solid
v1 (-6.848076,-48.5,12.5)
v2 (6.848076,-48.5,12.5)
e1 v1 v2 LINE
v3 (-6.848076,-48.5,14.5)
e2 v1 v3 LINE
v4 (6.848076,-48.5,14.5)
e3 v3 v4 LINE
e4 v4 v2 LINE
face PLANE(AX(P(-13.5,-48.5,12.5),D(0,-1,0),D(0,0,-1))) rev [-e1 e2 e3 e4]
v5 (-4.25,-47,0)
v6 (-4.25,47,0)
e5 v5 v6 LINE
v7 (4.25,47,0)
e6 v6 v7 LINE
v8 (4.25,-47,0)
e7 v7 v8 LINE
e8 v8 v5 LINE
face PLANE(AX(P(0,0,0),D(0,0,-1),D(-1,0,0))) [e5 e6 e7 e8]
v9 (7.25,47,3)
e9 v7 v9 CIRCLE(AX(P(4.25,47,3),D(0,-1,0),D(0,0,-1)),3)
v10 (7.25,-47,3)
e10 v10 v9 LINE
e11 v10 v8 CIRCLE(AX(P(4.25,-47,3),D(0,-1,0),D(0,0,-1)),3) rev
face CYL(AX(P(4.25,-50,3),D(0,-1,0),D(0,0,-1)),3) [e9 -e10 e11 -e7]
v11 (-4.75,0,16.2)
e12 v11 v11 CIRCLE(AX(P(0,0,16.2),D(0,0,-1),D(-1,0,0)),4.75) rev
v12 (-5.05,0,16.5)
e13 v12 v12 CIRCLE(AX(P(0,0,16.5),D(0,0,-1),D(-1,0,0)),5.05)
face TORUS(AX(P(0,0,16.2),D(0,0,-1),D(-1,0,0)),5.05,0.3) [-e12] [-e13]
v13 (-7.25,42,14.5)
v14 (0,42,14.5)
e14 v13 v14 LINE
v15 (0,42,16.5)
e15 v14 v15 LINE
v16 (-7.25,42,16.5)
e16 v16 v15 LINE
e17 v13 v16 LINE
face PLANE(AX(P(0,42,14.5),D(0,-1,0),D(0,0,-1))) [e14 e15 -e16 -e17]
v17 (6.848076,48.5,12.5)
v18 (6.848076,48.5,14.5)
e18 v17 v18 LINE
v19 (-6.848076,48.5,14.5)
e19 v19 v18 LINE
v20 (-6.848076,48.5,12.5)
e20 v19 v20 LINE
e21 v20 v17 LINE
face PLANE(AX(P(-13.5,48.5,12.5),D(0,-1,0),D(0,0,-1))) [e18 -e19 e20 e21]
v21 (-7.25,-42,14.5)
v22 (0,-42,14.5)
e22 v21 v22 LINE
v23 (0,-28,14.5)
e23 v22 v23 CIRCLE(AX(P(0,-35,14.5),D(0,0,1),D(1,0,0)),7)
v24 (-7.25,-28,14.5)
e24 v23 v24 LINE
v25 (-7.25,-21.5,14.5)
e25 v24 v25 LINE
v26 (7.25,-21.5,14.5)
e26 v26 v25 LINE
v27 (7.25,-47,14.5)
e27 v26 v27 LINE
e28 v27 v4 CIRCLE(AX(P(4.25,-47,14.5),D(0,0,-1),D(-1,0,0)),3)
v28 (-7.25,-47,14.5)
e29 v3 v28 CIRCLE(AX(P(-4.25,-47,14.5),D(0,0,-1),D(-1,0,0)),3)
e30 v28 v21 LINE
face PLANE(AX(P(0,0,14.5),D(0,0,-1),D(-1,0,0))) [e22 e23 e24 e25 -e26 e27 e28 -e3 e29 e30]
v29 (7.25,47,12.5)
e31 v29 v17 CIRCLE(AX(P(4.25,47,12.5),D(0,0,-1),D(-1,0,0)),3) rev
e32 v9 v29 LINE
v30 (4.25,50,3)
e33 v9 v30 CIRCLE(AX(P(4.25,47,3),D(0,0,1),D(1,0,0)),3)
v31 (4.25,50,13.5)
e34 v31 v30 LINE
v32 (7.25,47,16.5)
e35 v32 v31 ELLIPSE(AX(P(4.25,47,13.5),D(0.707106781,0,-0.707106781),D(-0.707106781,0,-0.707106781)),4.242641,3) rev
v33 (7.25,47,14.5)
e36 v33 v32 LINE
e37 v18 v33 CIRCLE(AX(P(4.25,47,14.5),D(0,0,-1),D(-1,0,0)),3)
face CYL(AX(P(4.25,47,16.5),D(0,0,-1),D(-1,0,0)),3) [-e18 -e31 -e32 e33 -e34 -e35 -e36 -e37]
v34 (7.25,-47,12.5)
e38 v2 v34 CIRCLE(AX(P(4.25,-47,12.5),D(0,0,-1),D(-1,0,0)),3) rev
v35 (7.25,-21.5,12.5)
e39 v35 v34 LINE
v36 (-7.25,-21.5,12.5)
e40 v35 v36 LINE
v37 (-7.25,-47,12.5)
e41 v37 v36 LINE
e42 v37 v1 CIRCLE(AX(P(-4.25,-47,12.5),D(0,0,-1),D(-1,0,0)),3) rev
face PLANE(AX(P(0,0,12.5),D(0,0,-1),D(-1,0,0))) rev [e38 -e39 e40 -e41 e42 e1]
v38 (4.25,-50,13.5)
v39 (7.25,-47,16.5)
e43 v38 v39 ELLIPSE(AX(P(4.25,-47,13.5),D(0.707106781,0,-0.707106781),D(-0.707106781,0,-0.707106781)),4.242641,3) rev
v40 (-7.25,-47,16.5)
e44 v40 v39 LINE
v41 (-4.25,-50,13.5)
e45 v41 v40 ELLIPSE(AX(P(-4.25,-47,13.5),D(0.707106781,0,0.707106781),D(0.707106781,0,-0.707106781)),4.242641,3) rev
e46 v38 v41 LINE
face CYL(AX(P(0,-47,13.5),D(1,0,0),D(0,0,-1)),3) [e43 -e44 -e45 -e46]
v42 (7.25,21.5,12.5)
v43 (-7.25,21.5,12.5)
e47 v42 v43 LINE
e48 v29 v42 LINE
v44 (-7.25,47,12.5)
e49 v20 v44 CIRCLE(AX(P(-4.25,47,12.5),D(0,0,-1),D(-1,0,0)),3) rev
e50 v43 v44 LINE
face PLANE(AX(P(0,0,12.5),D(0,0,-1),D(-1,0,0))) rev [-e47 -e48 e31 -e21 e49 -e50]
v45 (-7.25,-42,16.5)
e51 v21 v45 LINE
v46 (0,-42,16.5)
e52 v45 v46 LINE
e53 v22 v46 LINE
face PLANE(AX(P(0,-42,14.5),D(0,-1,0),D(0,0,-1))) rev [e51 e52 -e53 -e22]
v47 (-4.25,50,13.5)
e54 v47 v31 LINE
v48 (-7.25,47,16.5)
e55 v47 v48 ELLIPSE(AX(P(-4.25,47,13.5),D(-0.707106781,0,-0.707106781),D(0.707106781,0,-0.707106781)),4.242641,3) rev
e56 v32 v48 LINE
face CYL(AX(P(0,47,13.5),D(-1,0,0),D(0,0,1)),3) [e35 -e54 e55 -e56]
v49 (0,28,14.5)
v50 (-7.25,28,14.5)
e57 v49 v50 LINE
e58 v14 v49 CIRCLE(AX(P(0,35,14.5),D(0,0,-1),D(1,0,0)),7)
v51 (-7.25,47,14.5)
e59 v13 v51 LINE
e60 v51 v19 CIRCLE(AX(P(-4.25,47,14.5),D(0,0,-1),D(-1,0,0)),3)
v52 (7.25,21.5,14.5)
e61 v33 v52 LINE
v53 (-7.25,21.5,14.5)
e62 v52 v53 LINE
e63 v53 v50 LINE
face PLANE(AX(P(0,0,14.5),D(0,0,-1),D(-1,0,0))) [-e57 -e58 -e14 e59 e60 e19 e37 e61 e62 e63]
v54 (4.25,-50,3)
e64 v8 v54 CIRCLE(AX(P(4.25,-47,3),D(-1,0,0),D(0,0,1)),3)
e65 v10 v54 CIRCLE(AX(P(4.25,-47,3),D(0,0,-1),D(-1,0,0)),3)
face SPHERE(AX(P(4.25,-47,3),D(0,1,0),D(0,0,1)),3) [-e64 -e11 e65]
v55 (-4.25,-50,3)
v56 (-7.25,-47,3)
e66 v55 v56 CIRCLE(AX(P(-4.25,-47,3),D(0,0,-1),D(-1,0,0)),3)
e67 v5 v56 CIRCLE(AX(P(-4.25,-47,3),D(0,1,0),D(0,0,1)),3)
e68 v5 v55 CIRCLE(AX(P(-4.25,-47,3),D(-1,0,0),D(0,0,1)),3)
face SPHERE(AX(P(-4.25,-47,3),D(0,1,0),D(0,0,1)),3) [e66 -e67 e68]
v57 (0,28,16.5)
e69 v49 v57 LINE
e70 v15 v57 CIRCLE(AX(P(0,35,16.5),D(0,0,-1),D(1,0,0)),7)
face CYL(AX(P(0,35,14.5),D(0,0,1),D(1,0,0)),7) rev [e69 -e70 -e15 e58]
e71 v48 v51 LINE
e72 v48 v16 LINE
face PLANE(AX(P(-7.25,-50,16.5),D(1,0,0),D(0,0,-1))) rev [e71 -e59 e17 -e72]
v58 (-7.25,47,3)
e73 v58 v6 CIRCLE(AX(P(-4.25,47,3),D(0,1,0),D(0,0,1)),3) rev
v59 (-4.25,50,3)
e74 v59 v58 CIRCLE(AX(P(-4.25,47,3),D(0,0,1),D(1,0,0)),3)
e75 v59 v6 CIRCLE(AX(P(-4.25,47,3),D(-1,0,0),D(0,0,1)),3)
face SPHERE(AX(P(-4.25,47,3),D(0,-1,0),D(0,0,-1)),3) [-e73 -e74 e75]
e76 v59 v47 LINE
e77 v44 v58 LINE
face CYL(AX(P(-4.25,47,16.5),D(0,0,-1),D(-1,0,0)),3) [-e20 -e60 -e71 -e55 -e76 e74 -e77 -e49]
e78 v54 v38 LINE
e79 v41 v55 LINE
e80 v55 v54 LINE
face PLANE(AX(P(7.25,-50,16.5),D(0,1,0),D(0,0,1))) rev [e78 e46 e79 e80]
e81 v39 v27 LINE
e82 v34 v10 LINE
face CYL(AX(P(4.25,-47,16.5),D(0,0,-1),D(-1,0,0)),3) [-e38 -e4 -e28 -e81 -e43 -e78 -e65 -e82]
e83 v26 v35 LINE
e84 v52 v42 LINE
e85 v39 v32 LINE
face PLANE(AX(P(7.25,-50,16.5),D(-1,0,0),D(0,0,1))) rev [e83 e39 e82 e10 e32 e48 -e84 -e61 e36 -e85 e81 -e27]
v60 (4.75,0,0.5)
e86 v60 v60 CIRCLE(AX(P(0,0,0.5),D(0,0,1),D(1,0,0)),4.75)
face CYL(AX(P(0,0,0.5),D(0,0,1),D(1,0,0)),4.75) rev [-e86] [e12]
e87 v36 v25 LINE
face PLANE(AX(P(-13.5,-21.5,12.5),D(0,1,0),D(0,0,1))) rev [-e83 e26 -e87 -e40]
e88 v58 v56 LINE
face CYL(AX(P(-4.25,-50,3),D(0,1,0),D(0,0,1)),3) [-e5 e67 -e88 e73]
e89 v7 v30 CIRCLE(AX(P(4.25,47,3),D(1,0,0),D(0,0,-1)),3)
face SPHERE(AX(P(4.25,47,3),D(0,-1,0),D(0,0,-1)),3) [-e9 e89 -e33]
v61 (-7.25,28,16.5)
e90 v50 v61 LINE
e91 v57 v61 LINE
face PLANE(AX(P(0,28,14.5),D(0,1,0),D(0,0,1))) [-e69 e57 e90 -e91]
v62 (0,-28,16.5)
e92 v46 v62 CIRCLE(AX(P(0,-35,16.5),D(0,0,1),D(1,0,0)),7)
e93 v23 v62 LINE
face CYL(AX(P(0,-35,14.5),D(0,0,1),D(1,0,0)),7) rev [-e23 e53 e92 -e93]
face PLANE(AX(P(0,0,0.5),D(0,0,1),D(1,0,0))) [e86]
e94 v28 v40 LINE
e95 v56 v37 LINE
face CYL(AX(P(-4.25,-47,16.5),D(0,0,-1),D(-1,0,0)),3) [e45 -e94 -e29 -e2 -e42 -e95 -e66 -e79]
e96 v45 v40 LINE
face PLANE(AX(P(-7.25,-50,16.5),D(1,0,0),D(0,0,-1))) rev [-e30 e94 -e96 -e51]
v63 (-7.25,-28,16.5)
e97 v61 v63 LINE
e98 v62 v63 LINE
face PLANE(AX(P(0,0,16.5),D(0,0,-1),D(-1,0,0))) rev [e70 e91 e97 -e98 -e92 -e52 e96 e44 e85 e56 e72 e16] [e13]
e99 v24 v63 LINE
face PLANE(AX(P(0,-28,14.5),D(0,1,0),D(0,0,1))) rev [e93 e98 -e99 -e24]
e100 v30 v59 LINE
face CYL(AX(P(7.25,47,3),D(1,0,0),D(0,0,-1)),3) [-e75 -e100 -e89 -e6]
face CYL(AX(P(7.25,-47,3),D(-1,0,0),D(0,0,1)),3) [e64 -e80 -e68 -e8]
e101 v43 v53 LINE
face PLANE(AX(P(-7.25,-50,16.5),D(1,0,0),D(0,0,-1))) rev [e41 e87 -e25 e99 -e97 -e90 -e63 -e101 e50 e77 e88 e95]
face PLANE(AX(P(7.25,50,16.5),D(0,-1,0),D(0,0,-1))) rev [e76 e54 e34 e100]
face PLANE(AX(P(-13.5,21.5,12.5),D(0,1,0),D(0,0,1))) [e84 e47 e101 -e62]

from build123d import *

# Parameters (mm, degrees)
SKETCH7_W           = 100
SKETCH7_H           = 14.5
BOSS_EXTRUDE1_DEPTH = 16.5
SKETCH8_R           = 4.75
CUT_EXTRUDE2_DEPTH  = 16
CUT_EXTRUDE3_START  = -2
SKETCH9_W           = 27
SKETCH9_H           = 27
CUT_EXTRUDE3_DEPTH  = 2
CUT_EXTRUDE4_DEPTH  = 2
FILLET1_R           = 3
FILLET2_R           = 3
FILLET3_R           = 0.3
FILLET4_R           = 3


with BuildPart() as part:
    # Sketch7 → Boss-Extrude1 (new body)
    with BuildSketch(Plane(origin=(0, 0, 0), x_dir=(0, 1, 0), z_dir=(0, 0, 1))):
        Rectangle(SKETCH7_W, SKETCH7_H)
    extrude(amount=BOSS_EXTRUDE1_DEPTH)

    # Sketch8 → Cut-Extrude2 (cut)
    with BuildSketch(Plane(origin=(0, 0, 16.5), x_dir=(0, -1, 0), z_dir=(0, 0, 1))):
        with Locations(Location((0, 0, 0), (0, 0, 90))):
            Circle(SKETCH8_R)
    extrude(amount=-CUT_EXTRUDE2_DEPTH, mode=Mode.SUBTRACT)

    # Sketch9 → Cut-Extrude3 (cut)
    with BuildSketch(Plane.XY.offset(16.5).offset(CUT_EXTRUDE3_START)):
        with Locations((0, -35)):
            Rectangle(SKETCH9_W, SKETCH9_H)
    cut_extrude3 = extrude(amount=-CUT_EXTRUDE3_DEPTH, mode=Mode.SUBTRACT)

    # Sketch10 → Cut-Extrude4 (cut)
    with BuildSketch(Plane.XY.offset(16.5)):
        with BuildLine():
            Line((0, -28), (-7.25, -28))
            Line((-7.25, -28), (-7.25, -42))
            Line((-7.25, -42), (0, -42))
            ThreePointArc((0, -42), (7, -35), (0, -28))
        make_face()
    cut_extrude4 = extrude(amount=-CUT_EXTRUDE4_DEPTH, mode=Mode.SUBTRACT)

    # Mirror1: Cut-Extrude3 across plane
    add(cut_extrude3.mirror(Plane.ZX), mode=Mode.SUBTRACT)

    # Mirror2: Cut-Extrude4 across plane
    add(cut_extrude4.mirror(Plane.ZX), mode=Mode.SUBTRACT)

    # Fillet1
    fillet1_edges = [part.edges().sort_by_distance(p)[0] for p in [
        (-7.25, 0, 0),
    ]]
    fillet(fillet1_edges, radius=FILLET1_R)

    # Fillet2
    fillet2_edges = [part.edges().sort_by_distance(p)[0] for p in [
        (7.25, 0, 0),
    ]]
    fillet(fillet2_edges, radius=FILLET2_R)

    # Fillet3
    fillet3_edges = [part.edges().sort_by_distance(p)[0] for p in [
        (-4.75, 0, 16.5),
    ]]
    fillet(fillet3_edges, radius=FILLET3_R)

    # Fillet4
    # the kernel refuses this fillet: 3 mm, written as the material it takes off along each edge
    with BuildSketch(Plane(origin=(-4.25, -50, 3), x_dir=(0, 0, -1), z_dir=(1, 0, 0))) as fillet4_piece_1:
        with BuildLine():
            CenterArc((3 - FILLET4_R, FILLET4_R), FILLET4_R, 270, 90)
            Line((3, FILLET4_R), (3, 0))
            Line((3, 0), (3 - FILLET4_R, 0))
        make_face()
    revolve(axis=Axis((-4.25, -50, 3), (0, 1, 0)), revolution_arc=90, mode=Mode.SUBTRACT)
    with BuildSketch(Plane(origin=(-7.25, -50, 3), x_dir=(0, 1, 0), z_dir=(0, 0, 1))) as fillet4_piece_2:
        with BuildLine():
            CenterArc((FILLET4_R, -FILLET4_R), FILLET4_R, 90, 90)
            Line((0, -FILLET4_R), (0, 0))
            Line((0, 0), (FILLET4_R, 0))
        make_face()
    extrude(amount=21, mode=Mode.SUBTRACT)
    with BuildSketch(Plane(origin=(-14.75, -50, 16.5), x_dir=(0, 1, 0), z_dir=(1, 0, 0)), Plane(origin=(14.75, 50, 16.5), x_dir=(0, -1, 0), z_dir=(-1, 0, 0))) as fillet4_piece_3:
        with BuildLine():
            CenterArc((FILLET4_R, -FILLET4_R), FILLET4_R, 90, 90)
            Line((0, -FILLET4_R), (0, 0))
            Line((0, 0), (FILLET4_R, 0))
        make_face()
    extrude(amount=29.5, mode=Mode.SUBTRACT)
    with BuildSketch(Plane(origin=(7.25, -50, 3), x_dir=(0, 1, 0), z_dir=(0, 0, 1)), Plane(origin=(-7.25, 50, 3), x_dir=(0, -1, 0), z_dir=(0, 0, 1)), Plane(origin=(7.25, 50, 3), x_dir=(-1, 0, 0), z_dir=(0, 0, 1))) as fillet4_piece_4:
        with BuildLine():
            CenterArc((FILLET4_R, FILLET4_R), FILLET4_R, 180, 90)
            Line((0, FILLET4_R), (0, 0))
            Line((0, 0), (FILLET4_R, 0))
        make_face()
    extrude(amount=21, mode=Mode.SUBTRACT)
    with BuildSketch(Plane(origin=(4.25, -50, 3), x_dir=(0, 0, -1), z_dir=(-1, 0, 0))) as fillet4_piece_5:
        with BuildLine():
            CenterArc((3 - FILLET4_R, -FILLET4_R), FILLET4_R, 0, 90)
            Line((3, -FILLET4_R), (3, 0))
            Line((3, 0), (3 - FILLET4_R, 0))
        make_face()
    revolve(axis=Axis((4.25, -50, 3), (0, -1, 0)), revolution_arc=90, mode=Mode.SUBTRACT)
    with BuildSketch(Plane(origin=(-4.25, -50, 0), x_dir=(0, 0, 1), z_dir=(1, 0, 0)), Plane(origin=(4.25, 50, 0), x_dir=(0, 0, 1), z_dir=(-1, 0, 0))) as fillet4_piece_6:
        with BuildLine():
            CenterArc((FILLET4_R, -FILLET4_R), FILLET4_R, 90, 90)
            Line((0, -FILLET4_R), (0, 0))
            Line((0, 0), (FILLET4_R, 0))
        make_face()
    extrude(amount=8.5, mode=Mode.SUBTRACT)
    with BuildSketch(Plane(origin=(-4.25, 50, 3), x_dir=(0, 0, -1), z_dir=(1, 0, 0))) as fillet4_piece_7:
        with BuildLine():
            CenterArc((3 - FILLET4_R, -FILLET4_R), FILLET4_R, 0, 90)
            Line((3, -FILLET4_R), (3, 0))
            Line((3, 0), (3 - FILLET4_R, 0))
        make_face()
    revolve(axis=Axis((-4.25, 50, 3), (0, 1, 0)), revolution_arc=90, mode=Mode.SUBTRACT)
    with BuildSketch(Plane(origin=(4.25, 50, 3), x_dir=(0, 0, -1), z_dir=(-1, 0, 0))) as fillet4_piece_8:
        with BuildLine():
            CenterArc((3 - FILLET4_R, FILLET4_R), FILLET4_R, 270, 90)
            Line((3, FILLET4_R), (3, 0))
            Line((3, 0), (3 - FILLET4_R, 0))
        make_face()
    revolve(axis=Axis((4.25, 50, 3), (0, -1, 0)), revolution_arc=90, mode=Mode.SUBTRACT)


solid = part.part
